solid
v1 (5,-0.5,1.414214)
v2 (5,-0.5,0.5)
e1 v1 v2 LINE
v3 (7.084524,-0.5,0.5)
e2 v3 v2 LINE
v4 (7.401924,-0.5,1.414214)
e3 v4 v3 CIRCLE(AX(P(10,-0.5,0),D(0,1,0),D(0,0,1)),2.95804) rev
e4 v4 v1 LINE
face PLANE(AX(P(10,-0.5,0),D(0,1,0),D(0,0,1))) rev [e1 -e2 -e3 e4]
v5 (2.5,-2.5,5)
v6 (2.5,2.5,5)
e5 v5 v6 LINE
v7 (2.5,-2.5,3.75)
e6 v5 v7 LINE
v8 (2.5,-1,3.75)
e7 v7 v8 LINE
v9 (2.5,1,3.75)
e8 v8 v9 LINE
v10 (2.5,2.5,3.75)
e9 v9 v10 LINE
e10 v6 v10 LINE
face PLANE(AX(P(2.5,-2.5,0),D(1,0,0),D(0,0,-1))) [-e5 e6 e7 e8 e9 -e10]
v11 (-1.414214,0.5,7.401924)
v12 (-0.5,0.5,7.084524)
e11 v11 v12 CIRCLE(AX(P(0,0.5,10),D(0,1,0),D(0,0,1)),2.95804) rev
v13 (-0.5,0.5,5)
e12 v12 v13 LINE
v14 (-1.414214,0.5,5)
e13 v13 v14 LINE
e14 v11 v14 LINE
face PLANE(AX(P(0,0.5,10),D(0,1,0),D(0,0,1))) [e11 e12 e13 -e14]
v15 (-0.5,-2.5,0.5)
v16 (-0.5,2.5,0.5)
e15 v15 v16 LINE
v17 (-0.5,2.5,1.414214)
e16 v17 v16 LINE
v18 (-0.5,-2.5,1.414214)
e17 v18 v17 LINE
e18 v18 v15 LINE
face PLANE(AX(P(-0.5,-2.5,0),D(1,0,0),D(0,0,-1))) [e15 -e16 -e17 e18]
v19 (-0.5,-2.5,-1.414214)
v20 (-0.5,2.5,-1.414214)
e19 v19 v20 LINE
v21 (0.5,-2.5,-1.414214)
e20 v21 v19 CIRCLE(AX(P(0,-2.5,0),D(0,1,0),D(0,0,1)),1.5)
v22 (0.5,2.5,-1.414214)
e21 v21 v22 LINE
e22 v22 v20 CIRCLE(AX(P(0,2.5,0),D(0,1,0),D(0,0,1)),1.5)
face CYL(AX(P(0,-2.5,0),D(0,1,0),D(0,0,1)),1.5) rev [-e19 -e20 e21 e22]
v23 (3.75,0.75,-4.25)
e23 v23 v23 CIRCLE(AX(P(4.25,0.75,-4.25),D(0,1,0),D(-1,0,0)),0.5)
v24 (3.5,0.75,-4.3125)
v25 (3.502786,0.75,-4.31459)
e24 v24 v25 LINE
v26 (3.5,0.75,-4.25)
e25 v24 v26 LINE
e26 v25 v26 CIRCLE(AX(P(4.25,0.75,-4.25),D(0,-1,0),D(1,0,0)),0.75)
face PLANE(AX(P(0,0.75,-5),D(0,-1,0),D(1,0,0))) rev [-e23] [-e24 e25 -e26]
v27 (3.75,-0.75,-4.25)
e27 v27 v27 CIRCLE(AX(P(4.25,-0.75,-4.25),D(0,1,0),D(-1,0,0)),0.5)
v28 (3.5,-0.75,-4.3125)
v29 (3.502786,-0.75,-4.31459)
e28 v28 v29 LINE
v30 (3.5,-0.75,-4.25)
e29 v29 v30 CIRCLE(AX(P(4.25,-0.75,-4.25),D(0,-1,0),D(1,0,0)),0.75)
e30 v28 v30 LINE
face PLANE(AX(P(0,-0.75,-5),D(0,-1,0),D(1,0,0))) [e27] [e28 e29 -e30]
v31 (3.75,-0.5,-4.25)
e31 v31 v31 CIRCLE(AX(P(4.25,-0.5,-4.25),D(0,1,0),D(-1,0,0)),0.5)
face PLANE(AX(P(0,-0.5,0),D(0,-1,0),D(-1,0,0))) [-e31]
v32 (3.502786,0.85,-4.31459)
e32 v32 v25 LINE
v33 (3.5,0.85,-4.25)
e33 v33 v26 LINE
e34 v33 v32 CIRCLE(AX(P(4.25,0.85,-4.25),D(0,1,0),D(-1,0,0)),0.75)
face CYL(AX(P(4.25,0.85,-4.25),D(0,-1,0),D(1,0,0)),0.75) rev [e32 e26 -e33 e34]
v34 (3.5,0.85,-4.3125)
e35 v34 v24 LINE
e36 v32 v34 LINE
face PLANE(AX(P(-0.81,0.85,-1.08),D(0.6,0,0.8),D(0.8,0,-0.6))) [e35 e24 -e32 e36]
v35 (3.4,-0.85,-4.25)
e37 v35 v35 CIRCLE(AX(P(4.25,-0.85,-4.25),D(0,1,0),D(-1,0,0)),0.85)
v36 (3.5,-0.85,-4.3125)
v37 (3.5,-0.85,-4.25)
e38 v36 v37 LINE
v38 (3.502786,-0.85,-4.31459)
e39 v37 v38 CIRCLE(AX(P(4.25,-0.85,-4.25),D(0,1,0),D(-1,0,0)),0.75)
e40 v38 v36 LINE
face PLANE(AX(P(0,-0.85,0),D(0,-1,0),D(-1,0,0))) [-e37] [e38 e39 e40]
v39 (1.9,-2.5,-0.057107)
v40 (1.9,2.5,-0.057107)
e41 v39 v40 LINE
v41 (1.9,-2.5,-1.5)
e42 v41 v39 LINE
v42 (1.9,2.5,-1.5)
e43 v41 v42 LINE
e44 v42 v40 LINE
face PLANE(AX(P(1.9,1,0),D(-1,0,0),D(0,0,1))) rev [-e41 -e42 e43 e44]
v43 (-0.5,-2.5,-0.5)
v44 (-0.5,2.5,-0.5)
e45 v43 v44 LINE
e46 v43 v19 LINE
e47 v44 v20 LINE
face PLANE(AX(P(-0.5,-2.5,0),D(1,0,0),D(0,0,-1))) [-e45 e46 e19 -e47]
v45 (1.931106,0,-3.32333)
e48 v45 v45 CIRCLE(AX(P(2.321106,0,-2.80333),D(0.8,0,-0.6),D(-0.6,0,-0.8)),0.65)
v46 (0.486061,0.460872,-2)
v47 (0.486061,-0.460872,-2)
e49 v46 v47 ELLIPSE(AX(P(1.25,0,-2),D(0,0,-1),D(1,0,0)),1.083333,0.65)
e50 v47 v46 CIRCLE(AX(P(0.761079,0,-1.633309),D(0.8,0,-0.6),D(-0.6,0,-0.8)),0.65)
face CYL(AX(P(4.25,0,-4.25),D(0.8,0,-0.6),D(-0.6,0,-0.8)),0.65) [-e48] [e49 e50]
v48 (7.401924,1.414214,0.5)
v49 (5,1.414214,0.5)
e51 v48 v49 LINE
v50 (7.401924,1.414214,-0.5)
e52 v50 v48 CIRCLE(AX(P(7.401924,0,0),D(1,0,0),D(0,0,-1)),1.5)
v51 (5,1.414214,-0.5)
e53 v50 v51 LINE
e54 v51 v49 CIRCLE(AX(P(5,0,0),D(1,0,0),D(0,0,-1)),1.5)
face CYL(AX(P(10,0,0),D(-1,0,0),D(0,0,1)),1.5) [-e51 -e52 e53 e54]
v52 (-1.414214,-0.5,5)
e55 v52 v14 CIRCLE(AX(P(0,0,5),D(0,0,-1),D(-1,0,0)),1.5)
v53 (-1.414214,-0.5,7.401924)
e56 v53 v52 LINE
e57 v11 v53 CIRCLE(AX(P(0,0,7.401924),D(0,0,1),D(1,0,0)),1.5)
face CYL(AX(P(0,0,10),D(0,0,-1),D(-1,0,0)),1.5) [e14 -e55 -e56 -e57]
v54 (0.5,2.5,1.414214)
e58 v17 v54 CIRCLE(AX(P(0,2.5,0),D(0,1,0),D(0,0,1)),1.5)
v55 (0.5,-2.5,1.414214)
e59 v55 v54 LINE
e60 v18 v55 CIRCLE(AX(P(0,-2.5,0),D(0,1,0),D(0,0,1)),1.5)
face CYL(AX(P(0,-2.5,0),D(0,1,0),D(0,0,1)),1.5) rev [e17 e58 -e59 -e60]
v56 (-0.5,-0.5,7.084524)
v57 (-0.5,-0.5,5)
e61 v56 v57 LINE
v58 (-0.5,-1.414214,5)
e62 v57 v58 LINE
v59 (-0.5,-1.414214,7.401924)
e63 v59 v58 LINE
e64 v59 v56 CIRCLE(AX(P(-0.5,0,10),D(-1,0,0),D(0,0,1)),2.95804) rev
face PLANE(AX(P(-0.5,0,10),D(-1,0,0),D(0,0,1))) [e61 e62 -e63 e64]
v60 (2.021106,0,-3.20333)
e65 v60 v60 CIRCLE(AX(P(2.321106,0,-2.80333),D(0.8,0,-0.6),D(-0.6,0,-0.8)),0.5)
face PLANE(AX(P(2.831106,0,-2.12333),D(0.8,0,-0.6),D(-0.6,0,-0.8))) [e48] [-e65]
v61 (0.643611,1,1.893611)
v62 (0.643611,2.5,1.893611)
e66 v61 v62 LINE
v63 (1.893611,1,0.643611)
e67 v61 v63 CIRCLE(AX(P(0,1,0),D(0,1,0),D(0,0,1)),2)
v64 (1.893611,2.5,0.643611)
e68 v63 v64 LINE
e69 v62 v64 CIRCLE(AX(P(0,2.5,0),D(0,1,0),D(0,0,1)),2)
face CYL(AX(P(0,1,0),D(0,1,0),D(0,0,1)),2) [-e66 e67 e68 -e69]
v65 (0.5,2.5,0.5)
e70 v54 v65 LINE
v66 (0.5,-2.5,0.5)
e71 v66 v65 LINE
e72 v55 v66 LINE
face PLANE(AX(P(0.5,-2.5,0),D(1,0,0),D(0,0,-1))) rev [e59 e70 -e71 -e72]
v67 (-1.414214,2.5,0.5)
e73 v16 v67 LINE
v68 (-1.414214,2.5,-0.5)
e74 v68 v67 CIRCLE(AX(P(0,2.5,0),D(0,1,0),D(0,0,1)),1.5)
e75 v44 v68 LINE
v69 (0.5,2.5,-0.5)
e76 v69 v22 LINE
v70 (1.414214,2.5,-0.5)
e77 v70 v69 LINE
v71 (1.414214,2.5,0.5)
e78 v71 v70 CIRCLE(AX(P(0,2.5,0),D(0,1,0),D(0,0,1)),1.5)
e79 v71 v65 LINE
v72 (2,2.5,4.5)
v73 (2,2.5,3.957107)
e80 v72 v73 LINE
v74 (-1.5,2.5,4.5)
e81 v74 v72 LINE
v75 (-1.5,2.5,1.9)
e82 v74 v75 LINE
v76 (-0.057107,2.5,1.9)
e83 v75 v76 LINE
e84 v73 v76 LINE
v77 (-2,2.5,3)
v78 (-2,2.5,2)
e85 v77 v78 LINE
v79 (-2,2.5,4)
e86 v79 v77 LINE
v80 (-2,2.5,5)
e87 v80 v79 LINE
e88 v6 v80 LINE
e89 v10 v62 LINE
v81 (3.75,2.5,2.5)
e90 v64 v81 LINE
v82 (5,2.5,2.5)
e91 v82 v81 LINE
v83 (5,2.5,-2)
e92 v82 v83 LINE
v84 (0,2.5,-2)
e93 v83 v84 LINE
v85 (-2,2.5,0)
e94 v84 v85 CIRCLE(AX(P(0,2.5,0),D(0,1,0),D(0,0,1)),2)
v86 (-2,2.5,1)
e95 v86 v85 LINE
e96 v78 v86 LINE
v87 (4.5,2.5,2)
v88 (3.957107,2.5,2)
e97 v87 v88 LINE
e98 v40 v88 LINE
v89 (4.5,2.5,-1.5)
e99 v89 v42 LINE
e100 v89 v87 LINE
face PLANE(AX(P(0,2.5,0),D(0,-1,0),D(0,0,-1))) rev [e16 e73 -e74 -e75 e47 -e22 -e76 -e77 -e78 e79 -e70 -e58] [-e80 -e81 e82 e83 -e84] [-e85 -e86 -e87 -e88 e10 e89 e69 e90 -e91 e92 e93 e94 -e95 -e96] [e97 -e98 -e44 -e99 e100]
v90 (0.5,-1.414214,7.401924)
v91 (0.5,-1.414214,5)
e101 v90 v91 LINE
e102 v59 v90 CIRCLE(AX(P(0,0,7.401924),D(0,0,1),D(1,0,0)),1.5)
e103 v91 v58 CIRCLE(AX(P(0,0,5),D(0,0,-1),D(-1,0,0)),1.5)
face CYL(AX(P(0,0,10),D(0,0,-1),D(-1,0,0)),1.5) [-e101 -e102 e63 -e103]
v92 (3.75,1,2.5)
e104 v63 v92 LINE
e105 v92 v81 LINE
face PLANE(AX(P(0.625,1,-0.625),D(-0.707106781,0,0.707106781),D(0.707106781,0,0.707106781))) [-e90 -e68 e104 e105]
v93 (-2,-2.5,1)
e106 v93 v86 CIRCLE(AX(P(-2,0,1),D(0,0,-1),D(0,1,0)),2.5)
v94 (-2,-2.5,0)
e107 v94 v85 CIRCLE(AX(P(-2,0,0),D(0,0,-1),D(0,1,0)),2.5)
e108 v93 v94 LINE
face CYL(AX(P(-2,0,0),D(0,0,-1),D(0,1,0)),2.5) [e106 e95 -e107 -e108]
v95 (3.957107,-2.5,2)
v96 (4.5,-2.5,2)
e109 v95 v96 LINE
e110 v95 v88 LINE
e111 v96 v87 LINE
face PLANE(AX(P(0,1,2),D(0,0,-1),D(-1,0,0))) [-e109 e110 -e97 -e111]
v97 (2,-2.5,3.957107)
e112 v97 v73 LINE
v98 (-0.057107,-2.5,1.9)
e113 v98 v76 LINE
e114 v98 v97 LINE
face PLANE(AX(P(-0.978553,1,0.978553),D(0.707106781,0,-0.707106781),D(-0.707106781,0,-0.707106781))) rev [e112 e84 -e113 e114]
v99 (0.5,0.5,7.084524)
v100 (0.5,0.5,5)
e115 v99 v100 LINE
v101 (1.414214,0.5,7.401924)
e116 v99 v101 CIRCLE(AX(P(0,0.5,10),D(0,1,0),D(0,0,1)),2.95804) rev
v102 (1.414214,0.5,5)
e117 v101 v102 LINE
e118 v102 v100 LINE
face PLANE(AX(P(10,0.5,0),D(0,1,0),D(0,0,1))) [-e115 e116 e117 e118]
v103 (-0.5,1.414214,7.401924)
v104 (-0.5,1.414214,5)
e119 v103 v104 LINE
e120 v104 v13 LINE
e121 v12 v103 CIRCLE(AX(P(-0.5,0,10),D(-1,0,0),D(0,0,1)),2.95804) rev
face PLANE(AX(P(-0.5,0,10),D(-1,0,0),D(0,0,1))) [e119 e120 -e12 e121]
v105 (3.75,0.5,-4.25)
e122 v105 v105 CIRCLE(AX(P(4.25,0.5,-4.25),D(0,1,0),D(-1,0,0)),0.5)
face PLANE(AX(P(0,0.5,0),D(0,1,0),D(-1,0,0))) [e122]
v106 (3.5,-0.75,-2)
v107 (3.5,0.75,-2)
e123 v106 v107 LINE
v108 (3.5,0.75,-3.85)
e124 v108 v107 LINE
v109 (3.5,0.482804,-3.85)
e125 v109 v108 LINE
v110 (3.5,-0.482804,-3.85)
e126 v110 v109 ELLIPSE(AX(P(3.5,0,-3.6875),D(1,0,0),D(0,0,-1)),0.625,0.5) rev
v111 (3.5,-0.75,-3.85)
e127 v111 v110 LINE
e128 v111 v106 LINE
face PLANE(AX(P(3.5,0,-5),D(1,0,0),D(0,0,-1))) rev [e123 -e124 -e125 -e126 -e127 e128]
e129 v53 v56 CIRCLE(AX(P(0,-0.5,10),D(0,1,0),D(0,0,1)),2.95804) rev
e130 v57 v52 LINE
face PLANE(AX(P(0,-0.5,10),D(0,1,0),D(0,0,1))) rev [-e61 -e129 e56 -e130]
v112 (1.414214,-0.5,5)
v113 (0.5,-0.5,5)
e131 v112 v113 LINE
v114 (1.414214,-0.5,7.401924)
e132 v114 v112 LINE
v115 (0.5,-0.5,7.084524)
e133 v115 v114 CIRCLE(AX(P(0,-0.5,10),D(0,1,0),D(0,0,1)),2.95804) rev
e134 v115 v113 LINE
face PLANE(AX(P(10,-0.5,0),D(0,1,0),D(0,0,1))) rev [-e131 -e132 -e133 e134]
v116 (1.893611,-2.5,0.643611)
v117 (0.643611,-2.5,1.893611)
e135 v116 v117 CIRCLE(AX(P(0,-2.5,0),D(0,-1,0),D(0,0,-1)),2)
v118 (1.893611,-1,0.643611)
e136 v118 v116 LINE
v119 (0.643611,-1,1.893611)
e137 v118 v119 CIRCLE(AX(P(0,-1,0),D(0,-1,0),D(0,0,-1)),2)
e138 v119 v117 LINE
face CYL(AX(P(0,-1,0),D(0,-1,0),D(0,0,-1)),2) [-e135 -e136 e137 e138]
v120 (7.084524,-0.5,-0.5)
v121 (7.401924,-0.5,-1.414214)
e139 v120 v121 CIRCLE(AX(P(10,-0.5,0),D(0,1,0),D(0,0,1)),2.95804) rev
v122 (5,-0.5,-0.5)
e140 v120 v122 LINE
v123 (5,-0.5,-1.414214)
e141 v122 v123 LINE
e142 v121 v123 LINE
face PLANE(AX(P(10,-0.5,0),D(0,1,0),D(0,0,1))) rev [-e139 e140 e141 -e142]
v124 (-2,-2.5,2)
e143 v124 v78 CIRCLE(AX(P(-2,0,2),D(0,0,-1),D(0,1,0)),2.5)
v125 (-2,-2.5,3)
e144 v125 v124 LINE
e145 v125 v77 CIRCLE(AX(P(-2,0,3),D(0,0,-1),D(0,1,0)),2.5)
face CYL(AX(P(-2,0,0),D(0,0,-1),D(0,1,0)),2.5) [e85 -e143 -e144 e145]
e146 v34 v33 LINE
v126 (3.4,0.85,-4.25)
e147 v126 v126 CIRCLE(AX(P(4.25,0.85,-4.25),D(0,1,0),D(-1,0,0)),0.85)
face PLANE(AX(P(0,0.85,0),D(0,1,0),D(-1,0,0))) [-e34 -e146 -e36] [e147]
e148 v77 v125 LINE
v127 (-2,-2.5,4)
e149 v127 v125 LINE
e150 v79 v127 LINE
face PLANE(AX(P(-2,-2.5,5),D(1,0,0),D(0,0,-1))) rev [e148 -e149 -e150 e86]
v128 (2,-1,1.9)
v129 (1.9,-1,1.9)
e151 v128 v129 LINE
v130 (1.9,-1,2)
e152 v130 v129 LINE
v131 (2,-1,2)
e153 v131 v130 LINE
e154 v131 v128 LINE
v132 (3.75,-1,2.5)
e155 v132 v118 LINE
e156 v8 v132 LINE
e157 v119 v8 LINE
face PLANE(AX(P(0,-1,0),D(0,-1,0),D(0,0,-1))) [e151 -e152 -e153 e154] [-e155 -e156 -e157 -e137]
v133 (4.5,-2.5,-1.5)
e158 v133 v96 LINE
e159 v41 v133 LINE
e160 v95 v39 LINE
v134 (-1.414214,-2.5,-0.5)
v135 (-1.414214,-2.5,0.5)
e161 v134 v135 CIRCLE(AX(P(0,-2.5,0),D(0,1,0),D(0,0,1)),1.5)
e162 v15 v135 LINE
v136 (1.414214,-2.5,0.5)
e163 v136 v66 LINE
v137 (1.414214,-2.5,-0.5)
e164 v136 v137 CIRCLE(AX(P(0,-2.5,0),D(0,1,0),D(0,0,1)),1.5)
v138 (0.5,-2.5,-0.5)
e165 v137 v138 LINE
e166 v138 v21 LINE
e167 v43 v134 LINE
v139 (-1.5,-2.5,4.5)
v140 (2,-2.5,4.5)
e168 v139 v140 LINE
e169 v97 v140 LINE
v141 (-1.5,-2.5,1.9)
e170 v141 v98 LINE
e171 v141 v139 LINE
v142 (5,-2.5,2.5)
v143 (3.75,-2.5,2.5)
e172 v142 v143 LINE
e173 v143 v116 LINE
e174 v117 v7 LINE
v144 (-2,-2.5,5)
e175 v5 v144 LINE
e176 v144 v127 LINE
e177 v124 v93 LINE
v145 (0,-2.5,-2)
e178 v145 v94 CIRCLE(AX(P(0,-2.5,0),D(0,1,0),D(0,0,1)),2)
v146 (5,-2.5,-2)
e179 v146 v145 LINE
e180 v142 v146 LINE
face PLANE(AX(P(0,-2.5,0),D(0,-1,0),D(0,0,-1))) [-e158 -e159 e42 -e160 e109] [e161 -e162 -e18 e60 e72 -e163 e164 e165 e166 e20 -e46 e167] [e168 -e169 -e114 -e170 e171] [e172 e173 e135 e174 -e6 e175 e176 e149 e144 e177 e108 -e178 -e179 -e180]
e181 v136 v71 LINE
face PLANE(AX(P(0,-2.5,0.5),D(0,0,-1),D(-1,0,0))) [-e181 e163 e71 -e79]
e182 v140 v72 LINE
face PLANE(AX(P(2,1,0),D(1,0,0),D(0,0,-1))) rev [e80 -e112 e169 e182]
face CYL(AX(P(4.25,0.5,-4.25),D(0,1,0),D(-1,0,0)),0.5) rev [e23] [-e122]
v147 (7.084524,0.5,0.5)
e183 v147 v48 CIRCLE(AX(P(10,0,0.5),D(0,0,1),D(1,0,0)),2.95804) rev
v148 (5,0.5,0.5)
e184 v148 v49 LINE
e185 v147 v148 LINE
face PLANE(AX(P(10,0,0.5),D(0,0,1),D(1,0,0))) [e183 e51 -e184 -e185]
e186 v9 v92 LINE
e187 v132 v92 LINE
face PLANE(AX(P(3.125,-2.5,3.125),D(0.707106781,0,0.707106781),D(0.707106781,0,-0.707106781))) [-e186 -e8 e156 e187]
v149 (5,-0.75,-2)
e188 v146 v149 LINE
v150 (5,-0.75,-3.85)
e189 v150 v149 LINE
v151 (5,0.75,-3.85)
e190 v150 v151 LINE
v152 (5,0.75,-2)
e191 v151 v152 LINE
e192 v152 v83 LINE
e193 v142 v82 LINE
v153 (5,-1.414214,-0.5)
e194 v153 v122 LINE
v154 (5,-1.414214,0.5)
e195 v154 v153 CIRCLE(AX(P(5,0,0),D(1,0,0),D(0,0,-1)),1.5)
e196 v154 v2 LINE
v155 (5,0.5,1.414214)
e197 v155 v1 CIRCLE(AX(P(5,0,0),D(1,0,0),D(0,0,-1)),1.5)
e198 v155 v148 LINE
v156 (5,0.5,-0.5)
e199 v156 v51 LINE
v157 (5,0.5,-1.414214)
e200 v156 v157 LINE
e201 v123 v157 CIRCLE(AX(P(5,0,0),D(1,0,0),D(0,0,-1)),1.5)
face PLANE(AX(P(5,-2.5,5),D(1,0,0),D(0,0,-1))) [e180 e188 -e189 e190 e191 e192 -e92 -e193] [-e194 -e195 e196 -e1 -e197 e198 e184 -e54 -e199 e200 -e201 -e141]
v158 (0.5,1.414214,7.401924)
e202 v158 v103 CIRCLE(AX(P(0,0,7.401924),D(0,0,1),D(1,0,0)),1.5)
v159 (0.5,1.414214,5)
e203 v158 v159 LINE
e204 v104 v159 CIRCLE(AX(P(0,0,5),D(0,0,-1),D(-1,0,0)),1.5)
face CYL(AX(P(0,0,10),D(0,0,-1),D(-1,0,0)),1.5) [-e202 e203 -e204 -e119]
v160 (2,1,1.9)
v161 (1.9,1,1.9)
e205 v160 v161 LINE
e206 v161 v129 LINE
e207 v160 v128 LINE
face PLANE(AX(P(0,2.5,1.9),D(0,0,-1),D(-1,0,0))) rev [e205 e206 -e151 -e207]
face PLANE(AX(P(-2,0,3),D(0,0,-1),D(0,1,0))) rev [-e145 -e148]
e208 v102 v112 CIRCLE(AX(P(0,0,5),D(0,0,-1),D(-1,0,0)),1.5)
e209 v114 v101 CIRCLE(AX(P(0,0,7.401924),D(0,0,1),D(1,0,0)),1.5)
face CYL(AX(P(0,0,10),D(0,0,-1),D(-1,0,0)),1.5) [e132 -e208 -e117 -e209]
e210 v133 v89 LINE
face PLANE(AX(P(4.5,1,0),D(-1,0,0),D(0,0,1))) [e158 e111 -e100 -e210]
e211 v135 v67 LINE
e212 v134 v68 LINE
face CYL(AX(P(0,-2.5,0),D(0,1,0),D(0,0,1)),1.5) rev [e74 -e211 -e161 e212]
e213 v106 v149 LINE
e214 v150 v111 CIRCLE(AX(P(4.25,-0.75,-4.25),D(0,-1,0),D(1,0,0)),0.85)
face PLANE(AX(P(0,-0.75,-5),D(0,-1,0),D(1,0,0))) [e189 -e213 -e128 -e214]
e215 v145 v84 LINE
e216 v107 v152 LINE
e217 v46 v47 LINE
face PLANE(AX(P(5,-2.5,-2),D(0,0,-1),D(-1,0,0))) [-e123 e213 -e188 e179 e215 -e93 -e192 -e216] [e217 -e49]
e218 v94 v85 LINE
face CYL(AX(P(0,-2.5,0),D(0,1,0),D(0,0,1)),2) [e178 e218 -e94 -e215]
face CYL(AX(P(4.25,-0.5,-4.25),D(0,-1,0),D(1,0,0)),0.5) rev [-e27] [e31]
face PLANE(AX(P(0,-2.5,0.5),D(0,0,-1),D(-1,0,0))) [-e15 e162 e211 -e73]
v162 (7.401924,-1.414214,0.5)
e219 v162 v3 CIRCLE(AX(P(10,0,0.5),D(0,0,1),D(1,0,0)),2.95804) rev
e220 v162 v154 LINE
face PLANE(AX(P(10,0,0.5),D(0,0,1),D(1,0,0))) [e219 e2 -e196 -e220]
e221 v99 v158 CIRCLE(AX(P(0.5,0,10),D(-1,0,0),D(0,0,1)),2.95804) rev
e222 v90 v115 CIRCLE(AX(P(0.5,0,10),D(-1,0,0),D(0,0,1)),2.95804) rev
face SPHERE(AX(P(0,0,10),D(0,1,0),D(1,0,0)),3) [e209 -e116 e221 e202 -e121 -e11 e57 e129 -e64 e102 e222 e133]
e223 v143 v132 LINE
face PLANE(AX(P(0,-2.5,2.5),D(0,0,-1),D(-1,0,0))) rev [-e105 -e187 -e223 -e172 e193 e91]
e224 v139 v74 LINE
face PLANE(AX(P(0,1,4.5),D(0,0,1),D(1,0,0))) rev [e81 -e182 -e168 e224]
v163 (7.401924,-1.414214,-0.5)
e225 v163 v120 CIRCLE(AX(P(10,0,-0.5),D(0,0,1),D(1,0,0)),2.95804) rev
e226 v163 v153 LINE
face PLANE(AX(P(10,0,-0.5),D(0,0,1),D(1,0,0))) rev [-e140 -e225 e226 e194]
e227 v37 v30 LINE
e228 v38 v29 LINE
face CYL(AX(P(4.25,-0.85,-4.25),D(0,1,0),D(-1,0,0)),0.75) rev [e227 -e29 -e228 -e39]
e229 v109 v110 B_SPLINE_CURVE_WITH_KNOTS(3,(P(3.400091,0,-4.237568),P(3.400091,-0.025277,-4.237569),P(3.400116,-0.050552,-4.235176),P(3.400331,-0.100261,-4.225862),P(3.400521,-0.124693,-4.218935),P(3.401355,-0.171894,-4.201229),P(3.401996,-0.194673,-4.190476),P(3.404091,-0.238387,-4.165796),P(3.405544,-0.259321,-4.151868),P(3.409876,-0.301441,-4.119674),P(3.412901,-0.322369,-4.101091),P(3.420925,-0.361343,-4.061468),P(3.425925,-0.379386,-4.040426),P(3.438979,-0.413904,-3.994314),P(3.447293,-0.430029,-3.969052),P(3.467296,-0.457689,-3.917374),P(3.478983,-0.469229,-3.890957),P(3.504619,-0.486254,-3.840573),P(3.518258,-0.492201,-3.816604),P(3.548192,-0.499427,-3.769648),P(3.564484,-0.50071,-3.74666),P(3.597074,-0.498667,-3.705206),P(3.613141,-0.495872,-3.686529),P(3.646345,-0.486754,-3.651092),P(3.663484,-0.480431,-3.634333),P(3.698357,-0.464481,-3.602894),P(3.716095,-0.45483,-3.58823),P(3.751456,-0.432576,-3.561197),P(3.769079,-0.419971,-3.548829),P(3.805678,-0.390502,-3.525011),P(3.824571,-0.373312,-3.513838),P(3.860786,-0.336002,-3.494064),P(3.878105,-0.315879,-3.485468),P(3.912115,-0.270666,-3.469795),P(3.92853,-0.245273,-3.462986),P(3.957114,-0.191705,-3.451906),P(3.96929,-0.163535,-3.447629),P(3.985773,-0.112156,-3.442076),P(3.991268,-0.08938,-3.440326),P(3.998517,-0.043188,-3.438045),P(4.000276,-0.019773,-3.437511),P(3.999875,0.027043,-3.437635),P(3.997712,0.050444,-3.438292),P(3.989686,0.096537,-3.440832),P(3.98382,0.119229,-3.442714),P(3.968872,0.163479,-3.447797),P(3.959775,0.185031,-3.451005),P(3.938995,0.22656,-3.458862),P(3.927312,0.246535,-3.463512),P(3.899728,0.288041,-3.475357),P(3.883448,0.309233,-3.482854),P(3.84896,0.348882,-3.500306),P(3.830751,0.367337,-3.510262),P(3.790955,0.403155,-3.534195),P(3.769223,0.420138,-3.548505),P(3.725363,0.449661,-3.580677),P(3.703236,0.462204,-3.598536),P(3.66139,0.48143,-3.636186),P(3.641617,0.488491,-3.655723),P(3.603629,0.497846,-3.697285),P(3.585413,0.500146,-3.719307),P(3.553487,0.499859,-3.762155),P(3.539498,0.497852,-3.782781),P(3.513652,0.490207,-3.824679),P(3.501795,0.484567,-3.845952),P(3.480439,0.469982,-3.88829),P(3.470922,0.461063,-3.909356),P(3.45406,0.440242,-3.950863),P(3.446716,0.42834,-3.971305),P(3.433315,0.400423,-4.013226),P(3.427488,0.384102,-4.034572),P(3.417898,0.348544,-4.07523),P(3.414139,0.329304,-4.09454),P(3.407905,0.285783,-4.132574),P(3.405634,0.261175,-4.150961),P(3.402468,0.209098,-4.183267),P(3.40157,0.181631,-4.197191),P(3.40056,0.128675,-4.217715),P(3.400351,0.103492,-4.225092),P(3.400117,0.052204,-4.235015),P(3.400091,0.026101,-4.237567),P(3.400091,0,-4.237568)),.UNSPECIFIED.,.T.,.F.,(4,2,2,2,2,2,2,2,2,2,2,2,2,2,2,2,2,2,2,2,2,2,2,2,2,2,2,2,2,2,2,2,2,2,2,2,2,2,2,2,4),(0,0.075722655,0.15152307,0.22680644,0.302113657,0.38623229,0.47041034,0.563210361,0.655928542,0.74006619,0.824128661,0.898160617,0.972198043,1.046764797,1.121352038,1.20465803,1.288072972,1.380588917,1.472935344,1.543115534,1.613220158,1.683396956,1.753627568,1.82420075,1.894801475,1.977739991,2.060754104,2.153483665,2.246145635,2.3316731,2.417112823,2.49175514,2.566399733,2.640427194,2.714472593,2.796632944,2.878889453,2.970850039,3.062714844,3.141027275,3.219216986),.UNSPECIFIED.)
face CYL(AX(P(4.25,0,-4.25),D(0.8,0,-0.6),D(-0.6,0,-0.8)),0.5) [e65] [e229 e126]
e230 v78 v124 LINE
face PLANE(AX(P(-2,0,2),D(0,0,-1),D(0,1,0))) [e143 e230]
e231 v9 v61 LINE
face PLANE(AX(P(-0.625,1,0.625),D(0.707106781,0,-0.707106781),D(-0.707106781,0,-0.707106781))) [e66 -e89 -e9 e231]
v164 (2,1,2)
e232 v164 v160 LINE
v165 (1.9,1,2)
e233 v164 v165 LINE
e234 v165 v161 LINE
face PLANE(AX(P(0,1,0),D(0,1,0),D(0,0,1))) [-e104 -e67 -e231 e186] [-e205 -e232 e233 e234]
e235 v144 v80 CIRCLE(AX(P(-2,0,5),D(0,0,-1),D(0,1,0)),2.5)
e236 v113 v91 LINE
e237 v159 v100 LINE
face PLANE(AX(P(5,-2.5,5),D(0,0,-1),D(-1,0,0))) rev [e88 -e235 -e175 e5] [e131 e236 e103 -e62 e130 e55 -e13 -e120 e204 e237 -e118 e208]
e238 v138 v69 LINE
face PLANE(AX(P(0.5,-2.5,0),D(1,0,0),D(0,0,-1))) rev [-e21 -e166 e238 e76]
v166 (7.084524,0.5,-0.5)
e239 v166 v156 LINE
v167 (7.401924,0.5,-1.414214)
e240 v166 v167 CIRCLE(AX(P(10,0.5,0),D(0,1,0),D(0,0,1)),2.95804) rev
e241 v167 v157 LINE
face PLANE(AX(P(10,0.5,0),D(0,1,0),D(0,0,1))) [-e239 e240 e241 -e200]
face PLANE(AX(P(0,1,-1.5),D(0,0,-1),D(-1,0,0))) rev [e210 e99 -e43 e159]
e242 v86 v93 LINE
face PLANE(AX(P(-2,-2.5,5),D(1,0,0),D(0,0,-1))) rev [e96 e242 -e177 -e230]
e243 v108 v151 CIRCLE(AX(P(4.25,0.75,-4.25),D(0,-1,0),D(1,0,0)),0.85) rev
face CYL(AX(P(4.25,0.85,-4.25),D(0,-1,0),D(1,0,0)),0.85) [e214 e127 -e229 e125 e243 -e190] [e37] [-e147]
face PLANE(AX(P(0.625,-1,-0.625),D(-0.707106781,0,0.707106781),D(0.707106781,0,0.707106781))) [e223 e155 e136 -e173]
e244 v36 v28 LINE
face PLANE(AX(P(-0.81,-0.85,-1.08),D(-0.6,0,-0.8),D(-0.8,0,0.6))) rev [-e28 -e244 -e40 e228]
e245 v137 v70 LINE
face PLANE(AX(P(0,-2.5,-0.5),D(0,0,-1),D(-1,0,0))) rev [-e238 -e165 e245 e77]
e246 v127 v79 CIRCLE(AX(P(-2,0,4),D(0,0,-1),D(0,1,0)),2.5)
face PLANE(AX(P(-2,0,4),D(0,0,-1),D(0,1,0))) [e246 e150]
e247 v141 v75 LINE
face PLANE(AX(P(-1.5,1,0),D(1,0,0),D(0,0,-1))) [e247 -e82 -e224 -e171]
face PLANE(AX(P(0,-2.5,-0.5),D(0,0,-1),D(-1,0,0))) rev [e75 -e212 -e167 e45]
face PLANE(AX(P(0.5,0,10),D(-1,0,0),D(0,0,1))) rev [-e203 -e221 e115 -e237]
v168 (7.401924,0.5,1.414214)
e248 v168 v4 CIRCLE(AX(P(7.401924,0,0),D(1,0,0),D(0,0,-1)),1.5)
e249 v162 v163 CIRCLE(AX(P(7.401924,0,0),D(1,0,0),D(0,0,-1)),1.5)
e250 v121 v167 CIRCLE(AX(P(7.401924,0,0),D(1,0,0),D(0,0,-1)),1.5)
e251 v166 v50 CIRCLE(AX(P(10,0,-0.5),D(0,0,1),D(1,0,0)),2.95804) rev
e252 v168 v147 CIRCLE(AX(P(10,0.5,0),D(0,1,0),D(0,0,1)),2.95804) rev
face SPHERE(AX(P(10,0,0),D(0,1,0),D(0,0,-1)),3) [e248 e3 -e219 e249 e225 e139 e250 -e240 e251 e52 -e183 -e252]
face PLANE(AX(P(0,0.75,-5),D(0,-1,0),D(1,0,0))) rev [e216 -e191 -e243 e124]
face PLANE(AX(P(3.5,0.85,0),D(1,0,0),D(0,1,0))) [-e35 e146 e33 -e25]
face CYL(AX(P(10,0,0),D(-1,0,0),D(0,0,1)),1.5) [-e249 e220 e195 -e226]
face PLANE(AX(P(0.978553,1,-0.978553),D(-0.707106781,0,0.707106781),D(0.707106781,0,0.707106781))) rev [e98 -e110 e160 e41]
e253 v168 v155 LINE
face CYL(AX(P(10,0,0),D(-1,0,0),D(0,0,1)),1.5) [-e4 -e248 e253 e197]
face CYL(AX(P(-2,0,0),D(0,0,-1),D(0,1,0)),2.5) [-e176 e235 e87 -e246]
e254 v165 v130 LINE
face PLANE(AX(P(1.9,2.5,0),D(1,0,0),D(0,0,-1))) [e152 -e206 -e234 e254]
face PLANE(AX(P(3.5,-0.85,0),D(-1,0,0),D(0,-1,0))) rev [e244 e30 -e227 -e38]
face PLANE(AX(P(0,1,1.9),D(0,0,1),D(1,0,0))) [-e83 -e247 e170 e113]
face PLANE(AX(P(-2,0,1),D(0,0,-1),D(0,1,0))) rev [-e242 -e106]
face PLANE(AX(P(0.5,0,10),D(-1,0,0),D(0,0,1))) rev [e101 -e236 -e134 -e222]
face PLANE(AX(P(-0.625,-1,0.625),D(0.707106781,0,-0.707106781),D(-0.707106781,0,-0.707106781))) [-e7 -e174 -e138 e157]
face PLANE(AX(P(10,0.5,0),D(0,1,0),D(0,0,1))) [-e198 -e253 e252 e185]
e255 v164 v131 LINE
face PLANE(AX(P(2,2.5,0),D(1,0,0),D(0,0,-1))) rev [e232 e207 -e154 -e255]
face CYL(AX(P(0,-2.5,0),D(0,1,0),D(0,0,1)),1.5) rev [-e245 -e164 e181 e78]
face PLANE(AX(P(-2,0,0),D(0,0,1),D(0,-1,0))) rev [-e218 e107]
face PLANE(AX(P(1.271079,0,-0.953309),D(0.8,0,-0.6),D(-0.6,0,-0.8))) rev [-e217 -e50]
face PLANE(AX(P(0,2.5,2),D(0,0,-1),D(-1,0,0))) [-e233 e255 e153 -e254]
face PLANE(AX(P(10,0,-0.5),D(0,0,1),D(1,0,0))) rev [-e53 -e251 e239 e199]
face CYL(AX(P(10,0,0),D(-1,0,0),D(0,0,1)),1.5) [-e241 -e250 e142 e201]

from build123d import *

# Parameters (mm, degrees)
SKETCH3_W                = 1
SKETCH3_H                = 1
BOSS_EXTRUDE1_DEPTH      = 10
SKETCH4_W                = 1
SKETCH4_H                = 1
BOSS_EXTRUDE2_DEPTH      = 10
BOSS_EXTRUDE3_DEPTH      = 2.5
BOSS_EXTRUDE3_DEPTH_BACK = 2.5
SKETCH7_W                = 7
SKETCH7_H                = 7
CUT_EXTRUDE2_DEPTH       = 5
CUT_EXTRUDE3_DEPTH       = 1.5
SKETCH10_W               = 0.1
SKETCH10_H               = 0.1
CUT_EXTRUDE4_DEPTH       = 5
CUT_EXTRUDE5_DEPTH       = 5
CUT_EXTRUDE6_START       = -1.5
SKETCH10_3_W             = 0.1
SKETCH10_3_H             = 0.1
CUT_EXTRUDE6_DEPTH       = 1.5
SKETCH11_W               = 1
SKETCH11_H               = 2.5
REVOLVE7_ANGLE           = 180
SKETCH12_W               = 1.5
SKETCH12_H               = 0.75
BOSS_EXTRUDE4_DEPTH      = 3
CUT_EXTRUDE7_DEPTH       = 3
SKETCH14_R               = 0.5
CUT_EXTRUDE8_DEPTH       = 0.25
BOSS_EXTRUDE5_START      = -0.75
BOSS_EXTRUDE5_OUTLINE_R  = 0.85
BOSS_EXTRUDE5_DEPTH      = 0.85
CUT_EXTRUDE9_DEPTH       = 5
REVOLVE8_START           = 1.588848657
REVOLVE8_OUTLINE_R       = 0.5
REVOLVE8_DEPTH           = 3.673765089
REVOLVE8_2_OUTLINE_R     = 0.65
REVOLVE8_2_OUTLINE_R_2   = 0.5
REVOLVE8_2_DEPTH         = 1.950034347


# Read off the part's stored shape, not the designer's step: Boss-Extrude5, Revolve8
with BuildPart() as part:
    # Sketch3 → Boss-Extrude1 (new body)
    with BuildSketch(Plane(origin=(0, 0, 0), x_dir=(0, 0, -1), z_dir=(1, 0, 0))):
        with BuildLine():
            Line((-0.5, 1.414213562), (-0.5, 0.5))
            Line((-0.5, 0.5), (0.5, 0.5))
            Line((0.5, 0.5), (0.5, 1.414213562))
            ThreePointArc((0.5, 1.414213562), (0.253652968, 1.478397839), (0, 1.5))
            ThreePointArc((0, 1.5), (-0.253652968, 1.478397839), (-0.5, 1.414213562))
        make_face()
        Rectangle(SKETCH3_W, SKETCH3_H)
        with BuildLine():
            Line((0.5, 0.5), (0.5, -0.5))
            Line((0.5, -0.5), (1.414213562, -0.5))
            ThreePointArc((1.414213562, -0.5), (1.478397839, -0.253652968), (1.5, 0))
            ThreePointArc((1.5, 0), (1.478397839, 0.253652968), (1.414213562, 0.5))
            Line((1.414213562, 0.5), (0.5, 0.5))
        make_face()
        with BuildLine():
            Line((-1.414213562, -0.5), (-0.5, -0.5))
            Line((-0.5, -0.5), (-0.5, 0.5))
            Line((-0.5, 0.5), (-1.414213562, 0.5))
            ThreePointArc((-1.414213562, 0.5), (-1.478397839, 0.253652968), (-1.5, 0))
            ThreePointArc((-1.5, 0), (-1.478397839, -0.253652968), (-1.414213562, -0.5))
        make_face()
        with BuildLine():
            ThreePointArc((-0.5, -1.414213562), (-0.253652968, -1.478397839), (0, -1.5))
            ThreePointArc((0, -1.5), (0.253652968, -1.478397839), (0.5, -1.414213562))
            Line((0.5, -1.414213562), (0.5, -0.5))
            Line((0.5, -0.5), (-0.5, -0.5))
            Line((-0.5, -0.5), (-0.5, -1.414213562))
        make_face()
    extrude(amount=BOSS_EXTRUDE1_DEPTH)

    # Sketch4 → Boss-Extrude2 (add)
    with BuildSketch(Plane.XY):
        with BuildLine():
            Line((-0.5, 1.414213562), (-0.5, 0.5))
            Line((-0.5, 0.5), (0.5, 0.5))
            Line((0.5, 0.5), (0.5, 1.414213562))
            ThreePointArc((0.5, 1.414213562), (0.253652968, 1.478397839), (0, 1.5))
            ThreePointArc((0, 1.5), (-0.253652968, 1.478397839), (-0.5, 1.414213562))
        make_face()
        Rectangle(SKETCH4_W, SKETCH4_H)
        with BuildLine():
            ThreePointArc((-1.5, 0), (-1.478397839, -0.253652968), (-1.414213562, -0.5))
            Line((-1.414213562, -0.5), (-0.5, -0.5))
            Line((-0.5, -0.5), (-0.5, 0.5))
            Line((-0.5, 0.5), (-1.414213562, 0.5))
            ThreePointArc((-1.414213562, 0.5), (-1.478397839, 0.253652968), (-1.5, 0))
        make_face()
        with BuildLine():
            Line((0.5, 0.5), (0.5, -0.5))
            Line((0.5, -0.5), (1.414213562, -0.5))
            ThreePointArc((1.414213562, -0.5), (1.478397839, -0.253652968), (1.5, 0))
            ThreePointArc((1.5, 0), (1.478397839, 0.253652968), (1.414213562, 0.5))
            Line((1.414213562, 0.5), (0.5, 0.5))
        make_face()
        with BuildLine():
            Line((0.5, -0.5), (-0.5, -0.5))
            Line((-0.5, -0.5), (-0.5, -1.414213562))
            ThreePointArc((-0.5, -1.414213562), (-0.253652968, -1.478397839), (0, -1.5))
            ThreePointArc((0, -1.5), (0.253652968, -1.478397839), (0.5, -1.414213562))
            Line((0.5, -1.414213562), (0.5, -0.5))
        make_face()
    extrude(amount=BOSS_EXTRUDE2_DEPTH)

    # Sketch5 → Revolve5 (revolve)
    with BuildSketch(Plane(origin=(10, 0, 0), x_dir=(0, 0, -1), z_dir=(1, 0, 0)), mode=Mode.PRIVATE) as revolve5_sk:
        with BuildLine():
            ThreePointArc((3, 0), (2.121320344, 2.121320344), (0, 3))
            Line((0, 3), (0, 1.5))
            ThreePointArc((0, 1.5), (0.253652968, 1.478397839), (0.5, 1.414213562))
            Line((0.5, 1.414213562), (0.5, 0.5))
            Line((0.5, 0.5), (1.414213562, 0.5))
            ThreePointArc((1.414213562, 0.5), (1.5, 0), (1.414213562, -0.5))
            Line((1.414213562, -0.5), (0.5, -0.5))
            Line((0.5, -0.5), (0.5, -1.414213562))
            ThreePointArc((0.5, -1.414213562), (0.253652968, -1.478397839), (0, -1.5))
            Line((0, -1.5), (0, -3))
            ThreePointArc((0, -3), (2.121320344, -2.121320344), (3, 0))
        make_face()
        with BuildLine():
            ThreePointArc((0.5, 1.414213562), (0.253652968, 1.478397839), (0, 1.5))
            Line((0, 1.5), (0, -1.5))
            ThreePointArc((0, -1.5), (0.253652968, -1.478397839), (0.5, -1.414213562))
            Line((0.5, -1.414213562), (0.5, -0.5))
            Line((0.5, -0.5), (1.414213562, -0.5))
            ThreePointArc((1.414213562, -0.5), (1.5, 0), (1.414213562, 0.5))
            Line((1.414213562, 0.5), (0.5, 0.5))
            Line((0.5, 0.5), (0.5, 1.414213562))
        make_face()
    revolve(revolve5_sk.sketch.rotate(Axis((10, 3, 0), (0, -1, 0)), 120), axis=Axis((10, 3, 0), (0, -1, 0)))

    # Sketch6 → Revolve6 (revolve)
    with BuildSketch(Plane.XY.offset(10), mode=Mode.PRIVATE) as revolve6_sk:
        with BuildLine():
            ThreePointArc((3, 0), (2.121320344, 2.121320344), (0, 3))
            Line((0, 3), (0, 1.5))
            ThreePointArc((0, 1.5), (0.253652968, 1.478397839), (0.5, 1.414213562))
            Line((0.5, 1.414213562), (0.5, 0.5))
            Line((0.5, 0.5), (1.414213562, 0.5))
            ThreePointArc((1.414213562, 0.5), (1.5, 0), (1.414213562, -0.5))
            Line((1.414213562, -0.5), (0.5, -0.5))
            Line((0.5, -0.5), (0.5, -1.414213562))
            ThreePointArc((0.5, -1.414213562), (0.253652968, -1.478397839), (0, -1.5))
            Line((0, -1.5), (0, -3))
            ThreePointArc((0, -3), (2.121320344, -2.121320344), (3, 0))
        make_face()
        with BuildLine():
            ThreePointArc((0.5, 1.414213562), (0.253652968, 1.478397839), (0, 1.5))
            Line((0, 1.5), (0, -1.5))
            ThreePointArc((0, -1.5), (0.253652968, -1.478397839), (0.5, -1.414213562))
            Line((0.5, -1.414213562), (0.5, -0.5))
            Line((0.5, -0.5), (1.414213562, -0.5))
            ThreePointArc((1.414213562, -0.5), (1.5, 0), (1.414213562, 0.5))
            Line((1.414213562, 0.5), (0.5, 0.5))
            Line((0.5, 0.5), (0.5, 1.414213562))
        make_face()
    revolve(revolve6_sk.sketch.rotate(Axis((0, 3, 10), (0, -1, 0)), 120), axis=Axis((0, 3, 10), (0, -1, 0)))

    # Sketch7 → Boss-Extrude3 (add, two sides: drawn at the far end of the back side and taken through both)
    with BuildSketch(Plane(origin=(0, 0, 0), x_dir=(1, 0, 0), z_dir=(0, 1, 0)).offset(-BOSS_EXTRUDE3_DEPTH_BACK)):
        with Locations((1.5, -1.5)):
            Rectangle(SKETCH7_W, SKETCH7_H)
    extrude(amount=BOSS_EXTRUDE3_DEPTH + BOSS_EXTRUDE3_DEPTH_BACK)

    # Sketch8 → Cut-Extrude2 (cut)
    with BuildSketch(Plane(origin=(0, 2.5, 0), x_dir=(1, 0, 0), z_dir=(0, 1, 0))):
        with BuildLine():
            Line((-1.414213562, 1.414213562), (-2, 2))
            Line((-2, 2), (-2, 0))
            ThreePointArc((-2, 0), (-1.847759065, 0.765366865), (-1.414213562, 1.414213562))
        make_face()
        with BuildLine():
            Line((0, 2), (-2, 2))
            Line((-2, 2), (-1.414213562, 1.414213562))
            ThreePointArc((-1.414213562, 1.414213562), (-0.765366865, 1.847759065), (0, 2))
        make_face()
        with BuildLine():
            Line((-0.5, -0.5), (-0.5, 0.5))
            Line((-0.5, 0.5), (-1.414213562, 0.5))
            ThreePointArc((-1.414213562, 0.5), (-1.478397839, 0.253652968), (-1.5, 0))
            ThreePointArc((-1.5, 0), (-1.478397839, -0.253652968), (-1.414213562, -0.5))
            Line((-1.414213562, -0.5), (-0.5, -0.5))
        make_face()
        Polygon((0.5, 0.5), (-0.5, 0.5), (0.5, -0.5), align=None)
        Polygon((0.5, -0.5), (-0.5, 0.5), (-0.5, -0.5), align=None)
        with BuildLine():
            Line((0.5, -1.414213562), (0.5, -0.5))
            Line((0.5, -0.5), (-0.5, -0.5))
            Line((-0.5, -0.5), (-0.5, -1.414213562))
            ThreePointArc((-0.5, -1.414213562), (-0.253652968, -1.478397839), (0, -1.5))
            ThreePointArc((0, -1.5), (0.253652968, -1.478397839), (0.5, -1.414213562))
        make_face()
        with BuildLine():
            Line((-0.5, 1.414213562), (-0.5, 0.5))
            Line((-0.5, 0.5), (0.5, 0.5))
            Line((0.5, 0.5), (0.5, 1.414213562))
            ThreePointArc((0.5, 1.414213562), (0.253652968, 1.478397839), (0, 1.5))
            ThreePointArc((0, 1.5), (-0.253652968, 1.478397839), (-0.5, 1.414213562))
        make_face()
        with BuildLine():
            Line((0.5, 0.5), (0.5, -0.5))
            Line((0.5, -0.5), (1.414213562, -0.5))
            ThreePointArc((1.414213562, -0.5), (1.478397839, -0.253652968), (1.5, 0))
            ThreePointArc((1.5, 0), (1.478397839, 0.253652968), (1.414213562, 0.5))
            Line((1.414213562, 0.5), (0.5, 0.5))
        make_face()
    extrude(amount=-CUT_EXTRUDE2_DEPTH, mode=Mode.SUBTRACT)

    # Sketch9 → Cut-Extrude3 (cut)
    with BuildSketch(Plane(origin=(0, 2.5, 0), x_dir=(1, 0, 0), z_dir=(0, 1, 0))):
        with BuildLine():
            Line((3.75, -2.5), (1.893611446, -0.643611446))
            ThreePointArc((1.893611446, -0.643611446), (1.414213562, -1.414213562), (0.643611446, -1.893611446))
            Line((0.643611446, -1.893611446), (2.5, -3.75))
            Line((2.5, -3.75), (3.75, -2.5))
        make_face()
        Polygon((2, -4.5), (2, -3.957106781), (-0.057106781, -1.9), (-1.5, -1.9), (-1.5, -4.5), align=None)
        Polygon((3.957106781, -2), (4.5, -2), (4.5, 1.5), (1.9, 1.5), (1.9, 0.057106781), align=None)
    extrude(amount=-CUT_EXTRUDE3_DEPTH, mode=Mode.SUBTRACT)

    # Sketch10 → Cut-Extrude4 (cut)
    with BuildSketch(Plane(origin=(0, -2.5, 0), x_dir=(-1, 0, 0), z_dir=(0, -1, 0))):
        Polygon((-2, -3.957106781), (-2, -4.5), (1.5, -4.5), (1.5, -1.9), (0.057106781, -1.9), align=None)
        with Locations((-1.95, -1.95)):
            Rectangle(SKETCH10_W, SKETCH10_H)
        Polygon((-4.5, -2), (-3.957106781, -2), (-1.9, 0.057106781), (-1.9, 1.5), (-4.5, 1.5), align=None)
    extrude(amount=-CUT_EXTRUDE4_DEPTH, mode=Mode.SUBTRACT)

    # Sketch9<5> → Cut-Extrude5 (cut)
    with BuildSketch(Plane(origin=(0, 2.5, 0), x_dir=(1, 0, 0), z_dir=(0, 1, 0))):
        Polygon((3.125, -3.125), (2.5, -3.75), (2.5, -4.457106781), (3.478553391, -3.478553391), align=None)
        Polygon((3.75, -2.5), (3.125, -3.125), (3.478553391, -3.478553391), (4.457106781, -2.5), align=None)
        Polygon((3.478553391, -3.478553391), (2.5, -4.457106781), (2.5, -5), (5, -5), align=None)
        Polygon((4.457106781, -2.5), (3.478553391, -3.478553391), (5, -5), (5, -2.5), align=None)
    extrude(amount=-CUT_EXTRUDE5_DEPTH, mode=Mode.SUBTRACT)

    # Sketch10<3> → Cut-Extrude6 (cut)
    with BuildSketch(Plane(origin=(0, -2.5, 0), x_dir=(-1, 0, 0), z_dir=(0, -1, 0)).offset(CUT_EXTRUDE6_START)):
        Polygon((-3.25, -2), (-2, -2), (-2, -1.9), (-1.9, -1.9), (-1.9, -0.65), align=None)
        Polygon((-2.5, -2.5), (-2.5, -3.75), (-2, -3.25), (-2, -2), (-3.25, -2), (-3.75, -2.5), align=None)
        Polygon((-3.75, -2.5), (-3.125, -3.125), (-2.5, -2.5), align=None)
        Polygon((-3.125, -3.125), (-2.5, -3.75), (-2.5, -2.5), align=None)
        Polygon((-2, -2), (-2, -3.25), (-0.65, -1.9), (-1.9, -1.9), (-1.9, -2), align=None)
        with BuildLine():
            Line((-1.9, -1.9), (-0.65, -1.9))
            Line((-0.65, -1.9), (-0.643611446, -1.893611446))
            ThreePointArc((-0.643611446, -1.893611446), (-1.414213562, -1.414213562), (-1.893611446, -0.643611446))
            Line((-1.893611446, -0.643611446), (-1.9, -0.65))
            Line((-1.9, -0.65), (-1.9, -1.9))
        make_face()
        with Locations((-1.95, -1.95)):
            Rectangle(SKETCH10_3_W, SKETCH10_3_H)
    extrude(amount=CUT_EXTRUDE6_DEPTH, mode=Mode.SUBTRACT)

    # Sketch11 → Revolve7 (revolve)
    with BuildSketch(Plane.ZY.offset(2)):
        with Locations((0.5, 1.25)):
            Rectangle(SKETCH11_W, SKETCH11_H)
        with Locations((2.5, 1.25)):
            Rectangle(SKETCH11_W, SKETCH11_H)
        with Locations((4.5, 1.25)):
            Rectangle(SKETCH11_W, SKETCH11_H)
    revolve(axis=Axis((-2, 0, 0), (0, 0, 1)), revolution_arc=REVOLVE7_ANGLE)

    # Sketch12 → Boss-Extrude4 (add)
    with BuildSketch(Plane(origin=(0, 0, -2), x_dir=(-1, 0, 0), z_dir=(0, 0, -1))):
        with Locations((-4.25, 0.375)):
            Rectangle(SKETCH12_W, SKETCH12_H)
    boss_extrude4 = extrude(amount=BOSS_EXTRUDE4_DEPTH)

    # Sketch13 → Cut-Extrude7 (cut)
    with BuildSketch(Plane.XZ):
        with BuildLine():
            Line((3.502786405, -4.314589803), (3.5, -4.3125))
            Line((3.5, -4.3125), (3.5, -5))
            Line((3.5, -5), (4.25, -5))
            ThreePointArc((4.25, -5), (3.743019898, -4.802694469), (3.502786405, -4.314589803))
        make_face()
        with BuildLine():
            Line((5, -5), (5, -4.25))
            ThreePointArc((5, -4.25), (4.780330086, -4.780330086), (4.25, -5))
            Line((4.25, -5), (5, -5))
        make_face()
    extrude(amount=-CUT_EXTRUDE7_DEPTH, mode=Mode.SUBTRACT)

    # Sketch14 → Cut-Extrude8 (cut)
    with BuildSketch(Plane(origin=(0, 0.75, 0), x_dir=(1, 0, 0), z_dir=(0, 1, 0))):
        with Locations(Location((4.25, 4.25, 0), (0, 0, 180))):
            Circle(SKETCH14_R)
    cut_extrude8 = extrude(amount=-CUT_EXTRUDE8_DEPTH, mode=Mode.SUBTRACT)

    # Boss-Extrude5 outline → Boss-Extrude5 (add)
    with BuildSketch(Plane(origin=(0, 0.75, 0), x_dir=(1, 0, 0), z_dir=(0, 1, 0)).offset(BOSS_EXTRUDE5_START)):
        with Locations((4.25, 4.25)):
            Circle(BOSS_EXTRUDE5_OUTLINE_R)
        with BuildLine():
            ThreePointArc((3.502786405, 4.314589803), (4.999303074, 4.217675049), (3.5, 4.25))
            Line((3.5, 4.25), (3.5, 4.3125))
            Line((3.5, 4.3125), (3.502786405, 4.314589803))
        make_face(mode=Mode.SUBTRACT)
    boss_extrude5 = extrude(amount=BOSS_EXTRUDE5_DEPTH)

    # Mirror2: Boss-Extrude4, Cut-Extrude8, Boss-Extrude5 across plane
    add(boss_extrude4.mirror(Plane(origin=(0, 0, -5), x_dir=(0, 0, 1), z_dir=(0, 1, 0))))
    add(cut_extrude8.mirror(Plane(origin=(0, 0, -5), x_dir=(0, 0, 1), z_dir=(0, 1, 0))), mode=Mode.SUBTRACT)
    add(boss_extrude5.mirror(Plane(origin=(0, 0, -5), x_dir=(0, 0, 1), z_dir=(0, 1, 0))))

    # Sketch16 → Cut-Extrude9 (cut)
    with BuildSketch(Plane(origin=(0, -0.85, 0), x_dir=(-1, 0, 0), z_dir=(0, -1, 0))):
        with BuildLine():
            Line((-5.1, 5.1), (-5.1, 4.25))
            ThreePointArc((-5.1, 4.25), (-4.851040764, 4.851040764), (-4.25, 5.1))
            Line((-4.25, 5.1), (-5.1, 5.1))
        make_face()
        with BuildLine():
            Line((-3.4, 5.1), (-4.25, 5.1))
            ThreePointArc((-4.25, 5.1), (-3.648959236, 4.851040764), (-3.4, 4.25))
            Line((-3.4, 4.25), (-3.4, 5.1))
        make_face()
    extrude(amount=-CUT_EXTRUDE9_DEPTH, mode=Mode.SUBTRACT)

    # Revolve8 outline → Revolve8 (add)
    with BuildSketch(Plane(origin=(0, 0, 0), x_dir=(0.6, 0, 0.8000000000000002), z_dir=(0.8, 0, -0.6)).offset(REVOLVE8_START)):
        with Locations((-0.85, 0)):
            Circle(REVOLVE8_OUTLINE_R)
    extrude(amount=REVOLVE8_DEPTH)

    # Revolve8 2 outline → Revolve8 2 (add)
    with BuildSketch(Plane(origin=(0, 0, 0), x_dir=(0.6, 0, 0.8000000000000002), z_dir=(0.8, 0, -0.6)).offset(REVOLVE8_START)):
        with Locations((-0.85, 0)):
            Circle(REVOLVE8_2_OUTLINE_R)
        with Locations((-0.85, 0)):
            Circle(REVOLVE8_2_OUTLINE_R_2, mode=Mode.SUBTRACT)
    extrude(amount=REVOLVE8_2_DEPTH)


solid = part.part
